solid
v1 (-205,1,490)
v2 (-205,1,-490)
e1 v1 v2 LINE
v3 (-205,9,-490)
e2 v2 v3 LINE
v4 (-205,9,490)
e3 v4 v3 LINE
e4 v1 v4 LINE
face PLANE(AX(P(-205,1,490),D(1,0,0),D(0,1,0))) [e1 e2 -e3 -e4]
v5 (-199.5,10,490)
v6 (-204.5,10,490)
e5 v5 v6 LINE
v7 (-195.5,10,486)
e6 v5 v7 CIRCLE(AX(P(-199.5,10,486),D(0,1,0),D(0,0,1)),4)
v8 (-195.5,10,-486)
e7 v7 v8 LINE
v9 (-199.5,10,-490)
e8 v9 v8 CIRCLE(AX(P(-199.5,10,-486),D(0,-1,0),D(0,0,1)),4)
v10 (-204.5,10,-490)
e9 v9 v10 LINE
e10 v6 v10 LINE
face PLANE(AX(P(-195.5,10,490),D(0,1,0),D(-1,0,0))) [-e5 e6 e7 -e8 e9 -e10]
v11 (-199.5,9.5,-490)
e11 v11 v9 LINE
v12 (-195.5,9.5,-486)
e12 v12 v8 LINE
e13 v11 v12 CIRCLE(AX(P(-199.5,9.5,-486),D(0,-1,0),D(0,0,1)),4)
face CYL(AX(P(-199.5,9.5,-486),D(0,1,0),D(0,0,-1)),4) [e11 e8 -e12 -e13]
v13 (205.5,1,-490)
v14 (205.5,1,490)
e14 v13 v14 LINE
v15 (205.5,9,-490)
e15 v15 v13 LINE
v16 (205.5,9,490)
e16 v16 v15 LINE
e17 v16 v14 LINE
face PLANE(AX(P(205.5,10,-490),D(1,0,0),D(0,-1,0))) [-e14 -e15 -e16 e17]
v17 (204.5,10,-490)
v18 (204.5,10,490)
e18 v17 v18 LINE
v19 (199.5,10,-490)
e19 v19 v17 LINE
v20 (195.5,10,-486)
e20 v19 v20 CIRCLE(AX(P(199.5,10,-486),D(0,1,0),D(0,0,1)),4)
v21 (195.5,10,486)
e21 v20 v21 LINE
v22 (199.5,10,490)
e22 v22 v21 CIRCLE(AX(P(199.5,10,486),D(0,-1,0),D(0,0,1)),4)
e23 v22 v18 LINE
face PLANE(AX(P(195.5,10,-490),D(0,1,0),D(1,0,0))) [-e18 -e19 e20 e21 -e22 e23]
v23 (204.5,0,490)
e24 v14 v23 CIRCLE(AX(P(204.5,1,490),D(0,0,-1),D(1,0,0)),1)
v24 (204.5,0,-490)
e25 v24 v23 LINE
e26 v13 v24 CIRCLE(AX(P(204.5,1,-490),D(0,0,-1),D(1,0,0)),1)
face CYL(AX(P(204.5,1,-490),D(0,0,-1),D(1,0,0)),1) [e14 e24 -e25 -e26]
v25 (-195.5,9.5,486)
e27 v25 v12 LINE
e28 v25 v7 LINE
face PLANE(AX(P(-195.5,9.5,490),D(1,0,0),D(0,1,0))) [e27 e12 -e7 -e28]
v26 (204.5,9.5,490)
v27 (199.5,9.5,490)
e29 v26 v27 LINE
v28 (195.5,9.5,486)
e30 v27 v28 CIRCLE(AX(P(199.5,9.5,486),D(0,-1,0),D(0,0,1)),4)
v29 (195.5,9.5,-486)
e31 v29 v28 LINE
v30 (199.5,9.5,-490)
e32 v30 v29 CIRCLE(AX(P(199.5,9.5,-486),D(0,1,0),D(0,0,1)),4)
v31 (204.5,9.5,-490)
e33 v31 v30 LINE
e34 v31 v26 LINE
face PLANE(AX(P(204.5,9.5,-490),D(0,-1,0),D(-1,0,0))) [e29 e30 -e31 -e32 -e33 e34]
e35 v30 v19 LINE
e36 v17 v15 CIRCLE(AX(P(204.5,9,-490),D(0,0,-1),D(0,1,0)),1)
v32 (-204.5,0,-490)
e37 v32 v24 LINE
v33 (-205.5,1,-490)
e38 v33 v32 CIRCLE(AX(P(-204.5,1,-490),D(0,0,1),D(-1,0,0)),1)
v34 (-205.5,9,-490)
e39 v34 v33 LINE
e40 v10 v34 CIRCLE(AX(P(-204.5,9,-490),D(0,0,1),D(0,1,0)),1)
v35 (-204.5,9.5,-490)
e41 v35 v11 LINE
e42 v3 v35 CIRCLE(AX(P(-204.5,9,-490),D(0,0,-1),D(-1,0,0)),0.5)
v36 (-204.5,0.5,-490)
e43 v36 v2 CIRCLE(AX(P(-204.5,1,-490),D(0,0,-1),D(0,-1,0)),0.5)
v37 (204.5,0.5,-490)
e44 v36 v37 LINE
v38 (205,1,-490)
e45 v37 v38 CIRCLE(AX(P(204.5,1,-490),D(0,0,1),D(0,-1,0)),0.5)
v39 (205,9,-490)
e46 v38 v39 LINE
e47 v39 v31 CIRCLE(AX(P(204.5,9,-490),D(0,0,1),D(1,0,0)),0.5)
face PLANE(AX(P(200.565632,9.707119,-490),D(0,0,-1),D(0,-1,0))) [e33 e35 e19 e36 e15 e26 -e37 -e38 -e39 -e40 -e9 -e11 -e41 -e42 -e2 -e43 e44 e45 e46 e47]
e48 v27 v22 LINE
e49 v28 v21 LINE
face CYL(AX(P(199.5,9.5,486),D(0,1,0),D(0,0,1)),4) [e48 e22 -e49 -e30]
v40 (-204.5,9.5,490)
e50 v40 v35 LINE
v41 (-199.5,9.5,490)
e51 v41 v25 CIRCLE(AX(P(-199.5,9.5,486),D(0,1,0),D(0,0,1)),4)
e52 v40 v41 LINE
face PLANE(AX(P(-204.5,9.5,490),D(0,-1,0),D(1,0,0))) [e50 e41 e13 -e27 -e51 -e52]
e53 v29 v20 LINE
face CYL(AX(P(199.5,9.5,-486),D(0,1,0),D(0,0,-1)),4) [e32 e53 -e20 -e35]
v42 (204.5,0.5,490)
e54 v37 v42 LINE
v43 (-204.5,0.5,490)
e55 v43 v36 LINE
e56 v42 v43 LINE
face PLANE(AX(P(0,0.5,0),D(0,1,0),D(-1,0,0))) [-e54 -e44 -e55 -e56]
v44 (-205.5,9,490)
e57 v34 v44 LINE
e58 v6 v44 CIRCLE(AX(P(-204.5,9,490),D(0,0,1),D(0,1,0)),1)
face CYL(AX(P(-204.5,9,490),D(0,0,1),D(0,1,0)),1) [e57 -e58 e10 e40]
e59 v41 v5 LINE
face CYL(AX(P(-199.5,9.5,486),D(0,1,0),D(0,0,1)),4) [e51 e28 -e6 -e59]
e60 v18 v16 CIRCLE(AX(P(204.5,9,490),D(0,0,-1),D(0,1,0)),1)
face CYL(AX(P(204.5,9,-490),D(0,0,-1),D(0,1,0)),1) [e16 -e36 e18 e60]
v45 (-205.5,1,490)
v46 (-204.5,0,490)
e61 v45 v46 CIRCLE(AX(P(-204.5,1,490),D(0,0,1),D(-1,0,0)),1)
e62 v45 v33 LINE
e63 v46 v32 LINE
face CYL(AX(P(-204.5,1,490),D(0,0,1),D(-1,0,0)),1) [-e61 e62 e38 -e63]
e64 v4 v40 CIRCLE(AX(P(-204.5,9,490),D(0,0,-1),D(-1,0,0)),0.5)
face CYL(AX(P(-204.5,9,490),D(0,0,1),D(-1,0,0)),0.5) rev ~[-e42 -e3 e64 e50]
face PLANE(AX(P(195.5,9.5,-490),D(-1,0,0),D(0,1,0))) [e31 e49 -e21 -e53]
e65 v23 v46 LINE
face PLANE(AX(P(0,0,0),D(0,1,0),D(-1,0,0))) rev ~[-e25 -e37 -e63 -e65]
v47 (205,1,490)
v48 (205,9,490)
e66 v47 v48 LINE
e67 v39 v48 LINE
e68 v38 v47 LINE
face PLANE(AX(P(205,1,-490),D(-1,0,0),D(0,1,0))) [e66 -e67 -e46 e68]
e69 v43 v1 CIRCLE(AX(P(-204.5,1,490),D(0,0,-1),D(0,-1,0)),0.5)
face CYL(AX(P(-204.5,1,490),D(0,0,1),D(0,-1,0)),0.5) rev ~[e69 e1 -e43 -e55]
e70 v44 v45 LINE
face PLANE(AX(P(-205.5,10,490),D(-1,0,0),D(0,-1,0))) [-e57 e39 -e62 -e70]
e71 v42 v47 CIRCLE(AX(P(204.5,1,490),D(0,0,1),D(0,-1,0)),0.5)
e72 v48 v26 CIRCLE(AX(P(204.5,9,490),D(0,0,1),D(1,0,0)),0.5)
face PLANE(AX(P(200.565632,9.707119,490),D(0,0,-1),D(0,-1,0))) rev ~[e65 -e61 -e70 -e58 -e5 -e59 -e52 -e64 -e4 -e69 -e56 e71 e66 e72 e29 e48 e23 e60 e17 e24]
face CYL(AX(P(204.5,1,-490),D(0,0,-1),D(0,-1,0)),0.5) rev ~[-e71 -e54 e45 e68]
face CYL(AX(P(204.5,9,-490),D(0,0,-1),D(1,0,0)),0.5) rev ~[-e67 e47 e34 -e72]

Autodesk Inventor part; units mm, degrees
ref_plane "YZ Plane" through (0, 0, 0) normal (1, 0, 0) x (0, 1, 0)
ref_plane "XZ Plane" through (0, 0, 0) normal (0, 1, 0) x (-1, 0, 0)
ref_plane "XY Plane" through (0, 0, 0) normal (0, 0, 1) x (1, 0, 0)
sketch "Sketch6" plane through (0, 0, 0) normal (0, 1, 0) x (-1, 0, 0)
  line L0 (205.5, -490) -> (-205.5, -490)
  line L1 (-205.5, -490) -> (-205.5, 490)
  line L2 (-205.5, 490) -> (205.5, 490)
  line L3 (205.5, 490) -> (205.5, -490)
  line L4 (205.5, -490) -> (-205.5, 490) construction
  line L5 (-205.5, -490) -> (205.5, 490) construction
  point P0 (0, 0)
  dimension "d52" = 411
  dimension "d53" = 980
extrude "Plate2" add sketch "Sketch6" along normal blind 0.5
sketch "Sketch11" plane through (-205, 0, 490) normal (-1, 0, 0) x (0, -1, 0)
  line L0 (0, -980) -> (0, 0)
  line L1 (0, 0) -> (-10, 0)
  line L2 (-10, 0) -> (-10, -980)
  line L3 (-10, -980) -> (0, -980)
edge flange "Flange2" height 10 angle 90 thickness 0.5 bend radius 0.5 thickness toward (-1, 0, 0) relief tear relief width 0.5 relief depth 0.25 edges at (-205.5, 0.5, 0) wall of the first edge with corners at (-205, 0, -490) (-205, 0, 490) (-205, 10, 490) (-205, 10, -490)
bend "Bend3"
corner "Corner3"
sketch "Sketch12" plane through (-205.5, 9.5, 490) normal (0, 1, 0) x (-1, 0, 0)
  line L0 (0, -980) -> (0, 0)
  line L1 (0, 0) -> (-10, 0)
  line L2 (-10, 0) -> (-10, -980)
  line L3 (-10, -980) -> (0, -980)
edge flange "Flange3" height 10 angle 90 thickness 0.5 bend radius 0.5 thickness toward (0, 1, 0) relief tear relief width 0.5 relief depth 0.25 edges at (-205, 10, 0) wall of the first edge with corners at (-205.5, 9.5, -490) (-205.5, 9.5, 490) (-195.5, 9.5, 490) (-195.5, 9.5, -490)
bend "Bend4"
corner "Corner4"
sketch "Sketch13" plane through (205, 0, -490) normal (1, 0, 0) x (0, 1, 0)
  line L0 (0, 980) -> (0, 0)
  line L1 (0, 0) -> (10, 0)
  line L2 (10, 0) -> (10, 980)
  line L3 (10, 980) -> (0, 980)
edge flange "Flange4" height 10 angle 90 thickness 0.5 bend radius 0.5 thickness toward (1, 0, 0) relief tear relief width 0.5 relief depth 0.25 edges at (205.5, 0.5, 0) wall of the first edge with corners at (205, 0, 490) (205, 0, -490) (205, 10, -490) (205, 10, 490)
bend "Bend5"
corner "Corner5"
sketch "Sketch14" plane through (205.5, 9.5, -490) normal (0, 1, 0) x (-1, 0, 0)
  line L0 (0, 980) -> (0, 0)
  line L1 (0, 0) -> (10, 0)
  line L2 (10, 0) -> (10, 980)
  line L3 (10, 980) -> (0, 980)
edge flange "Flange5" height 10 angle 90 thickness 0.5 bend radius 0.5 thickness toward (0, 1, 0) relief tear relief width 0.5 relief depth 0.25 edges at (205, 10, 0) wall of the first edge with corners at (205.5, 9.5, 490) (205.5, 9.5, -490) (195.5, 9.5, -490) (195.5, 9.5, 490)
bend "Bend6"
corner "Corner6"
fillet "Corner Round1" radius 4 4 edges at (195.5, 9.75, -490) (-195.5, 9.75, -490) (-195.5, 9.75, 490) (195.5, 9.75, 490)
equation "\"d52\" = ЖАБРЫ_базовая_ширина - 5 * ЖАБРЫ_шаг_листов"
equation "\"d53\" = ЖАБРЫ_базовая_длина_кор_лист"
equation "\"d54\" = Thickness"
equation "\"d84\" = BendReliefWidth"
equation "\"d85\" = BendReliefDepth"
equation "\"d86\" = MinimumRemnant"
equation "\"d87\" = TransitionRadius"
equation "\"d90\" = BendRadius"
equation "\"d91\" = CornerReliefSize"
equation "\"d92\" = GapSize"
equation "\"d93\" = JacobiRadiusSize"
equation "\"d94\" = BendReliefWidth"
equation "\"d95\" = BendReliefDepth"
equation "\"d96\" = MinimumRemnant"
equation "\"d97\" = TransitionRadius"
equation "\"d100\" = BendRadius"
equation "\"d101\" = CornerReliefSize"
equation "\"d102\" = GapSize"
equation "\"d103\" = JacobiRadiusSize"
equation "\"d104\" = BendReliefWidth"
equation "\"d105\" = BendReliefDepth"
equation "\"d106\" = MinimumRemnant"
equation "\"d107\" = TransitionRadius"
equation "\"d110\" = BendRadius"
equation "\"d111\" = CornerReliefSize"
equation "\"d112\" = GapSize"
equation "\"d113\" = JacobiRadiusSize"
equation "\"d114\" = BendReliefWidth"
equation "\"d115\" = BendReliefDepth"
equation "\"d116\" = MinimumRemnant"
equation "\"d117\" = TransitionRadius"
equation "\"d120\" = BendRadius"
equation "\"d121\" = CornerReliefSize"
equation "\"d122\" = GapSize"
equation "\"d123\" = JacobiRadiusSize"
equation "\"BendRadius\" = Thickness"
equation "\"BendReliefWidth\" = Thickness"
equation "\"BendReliefDepth\" = 0.5 * Thickness"
equation "\"CornerReliefSize\" = 4 * Thickness"
equation "\"MinimumRemnant\" = 2 * Thickness"
equation "\"TransitionRadius\" = BendRadius"
equation "\"JacobiRadiusSize\" = BendRadius"
equation "\"GapSize\" = Thickness"
equation "\"ЖАБРЫ_базовая_ширина\" = 915"
equation "\"ЖАБРЫ_шаг_листов\" = 100.8"
equation "\"ЖАБРЫ_базовая_длина_кор_лист\" = 980"
equation "\"Thickness\" = 0.5"
properties part number "MSC 811 sheet gills" material "Stainless Steel"
